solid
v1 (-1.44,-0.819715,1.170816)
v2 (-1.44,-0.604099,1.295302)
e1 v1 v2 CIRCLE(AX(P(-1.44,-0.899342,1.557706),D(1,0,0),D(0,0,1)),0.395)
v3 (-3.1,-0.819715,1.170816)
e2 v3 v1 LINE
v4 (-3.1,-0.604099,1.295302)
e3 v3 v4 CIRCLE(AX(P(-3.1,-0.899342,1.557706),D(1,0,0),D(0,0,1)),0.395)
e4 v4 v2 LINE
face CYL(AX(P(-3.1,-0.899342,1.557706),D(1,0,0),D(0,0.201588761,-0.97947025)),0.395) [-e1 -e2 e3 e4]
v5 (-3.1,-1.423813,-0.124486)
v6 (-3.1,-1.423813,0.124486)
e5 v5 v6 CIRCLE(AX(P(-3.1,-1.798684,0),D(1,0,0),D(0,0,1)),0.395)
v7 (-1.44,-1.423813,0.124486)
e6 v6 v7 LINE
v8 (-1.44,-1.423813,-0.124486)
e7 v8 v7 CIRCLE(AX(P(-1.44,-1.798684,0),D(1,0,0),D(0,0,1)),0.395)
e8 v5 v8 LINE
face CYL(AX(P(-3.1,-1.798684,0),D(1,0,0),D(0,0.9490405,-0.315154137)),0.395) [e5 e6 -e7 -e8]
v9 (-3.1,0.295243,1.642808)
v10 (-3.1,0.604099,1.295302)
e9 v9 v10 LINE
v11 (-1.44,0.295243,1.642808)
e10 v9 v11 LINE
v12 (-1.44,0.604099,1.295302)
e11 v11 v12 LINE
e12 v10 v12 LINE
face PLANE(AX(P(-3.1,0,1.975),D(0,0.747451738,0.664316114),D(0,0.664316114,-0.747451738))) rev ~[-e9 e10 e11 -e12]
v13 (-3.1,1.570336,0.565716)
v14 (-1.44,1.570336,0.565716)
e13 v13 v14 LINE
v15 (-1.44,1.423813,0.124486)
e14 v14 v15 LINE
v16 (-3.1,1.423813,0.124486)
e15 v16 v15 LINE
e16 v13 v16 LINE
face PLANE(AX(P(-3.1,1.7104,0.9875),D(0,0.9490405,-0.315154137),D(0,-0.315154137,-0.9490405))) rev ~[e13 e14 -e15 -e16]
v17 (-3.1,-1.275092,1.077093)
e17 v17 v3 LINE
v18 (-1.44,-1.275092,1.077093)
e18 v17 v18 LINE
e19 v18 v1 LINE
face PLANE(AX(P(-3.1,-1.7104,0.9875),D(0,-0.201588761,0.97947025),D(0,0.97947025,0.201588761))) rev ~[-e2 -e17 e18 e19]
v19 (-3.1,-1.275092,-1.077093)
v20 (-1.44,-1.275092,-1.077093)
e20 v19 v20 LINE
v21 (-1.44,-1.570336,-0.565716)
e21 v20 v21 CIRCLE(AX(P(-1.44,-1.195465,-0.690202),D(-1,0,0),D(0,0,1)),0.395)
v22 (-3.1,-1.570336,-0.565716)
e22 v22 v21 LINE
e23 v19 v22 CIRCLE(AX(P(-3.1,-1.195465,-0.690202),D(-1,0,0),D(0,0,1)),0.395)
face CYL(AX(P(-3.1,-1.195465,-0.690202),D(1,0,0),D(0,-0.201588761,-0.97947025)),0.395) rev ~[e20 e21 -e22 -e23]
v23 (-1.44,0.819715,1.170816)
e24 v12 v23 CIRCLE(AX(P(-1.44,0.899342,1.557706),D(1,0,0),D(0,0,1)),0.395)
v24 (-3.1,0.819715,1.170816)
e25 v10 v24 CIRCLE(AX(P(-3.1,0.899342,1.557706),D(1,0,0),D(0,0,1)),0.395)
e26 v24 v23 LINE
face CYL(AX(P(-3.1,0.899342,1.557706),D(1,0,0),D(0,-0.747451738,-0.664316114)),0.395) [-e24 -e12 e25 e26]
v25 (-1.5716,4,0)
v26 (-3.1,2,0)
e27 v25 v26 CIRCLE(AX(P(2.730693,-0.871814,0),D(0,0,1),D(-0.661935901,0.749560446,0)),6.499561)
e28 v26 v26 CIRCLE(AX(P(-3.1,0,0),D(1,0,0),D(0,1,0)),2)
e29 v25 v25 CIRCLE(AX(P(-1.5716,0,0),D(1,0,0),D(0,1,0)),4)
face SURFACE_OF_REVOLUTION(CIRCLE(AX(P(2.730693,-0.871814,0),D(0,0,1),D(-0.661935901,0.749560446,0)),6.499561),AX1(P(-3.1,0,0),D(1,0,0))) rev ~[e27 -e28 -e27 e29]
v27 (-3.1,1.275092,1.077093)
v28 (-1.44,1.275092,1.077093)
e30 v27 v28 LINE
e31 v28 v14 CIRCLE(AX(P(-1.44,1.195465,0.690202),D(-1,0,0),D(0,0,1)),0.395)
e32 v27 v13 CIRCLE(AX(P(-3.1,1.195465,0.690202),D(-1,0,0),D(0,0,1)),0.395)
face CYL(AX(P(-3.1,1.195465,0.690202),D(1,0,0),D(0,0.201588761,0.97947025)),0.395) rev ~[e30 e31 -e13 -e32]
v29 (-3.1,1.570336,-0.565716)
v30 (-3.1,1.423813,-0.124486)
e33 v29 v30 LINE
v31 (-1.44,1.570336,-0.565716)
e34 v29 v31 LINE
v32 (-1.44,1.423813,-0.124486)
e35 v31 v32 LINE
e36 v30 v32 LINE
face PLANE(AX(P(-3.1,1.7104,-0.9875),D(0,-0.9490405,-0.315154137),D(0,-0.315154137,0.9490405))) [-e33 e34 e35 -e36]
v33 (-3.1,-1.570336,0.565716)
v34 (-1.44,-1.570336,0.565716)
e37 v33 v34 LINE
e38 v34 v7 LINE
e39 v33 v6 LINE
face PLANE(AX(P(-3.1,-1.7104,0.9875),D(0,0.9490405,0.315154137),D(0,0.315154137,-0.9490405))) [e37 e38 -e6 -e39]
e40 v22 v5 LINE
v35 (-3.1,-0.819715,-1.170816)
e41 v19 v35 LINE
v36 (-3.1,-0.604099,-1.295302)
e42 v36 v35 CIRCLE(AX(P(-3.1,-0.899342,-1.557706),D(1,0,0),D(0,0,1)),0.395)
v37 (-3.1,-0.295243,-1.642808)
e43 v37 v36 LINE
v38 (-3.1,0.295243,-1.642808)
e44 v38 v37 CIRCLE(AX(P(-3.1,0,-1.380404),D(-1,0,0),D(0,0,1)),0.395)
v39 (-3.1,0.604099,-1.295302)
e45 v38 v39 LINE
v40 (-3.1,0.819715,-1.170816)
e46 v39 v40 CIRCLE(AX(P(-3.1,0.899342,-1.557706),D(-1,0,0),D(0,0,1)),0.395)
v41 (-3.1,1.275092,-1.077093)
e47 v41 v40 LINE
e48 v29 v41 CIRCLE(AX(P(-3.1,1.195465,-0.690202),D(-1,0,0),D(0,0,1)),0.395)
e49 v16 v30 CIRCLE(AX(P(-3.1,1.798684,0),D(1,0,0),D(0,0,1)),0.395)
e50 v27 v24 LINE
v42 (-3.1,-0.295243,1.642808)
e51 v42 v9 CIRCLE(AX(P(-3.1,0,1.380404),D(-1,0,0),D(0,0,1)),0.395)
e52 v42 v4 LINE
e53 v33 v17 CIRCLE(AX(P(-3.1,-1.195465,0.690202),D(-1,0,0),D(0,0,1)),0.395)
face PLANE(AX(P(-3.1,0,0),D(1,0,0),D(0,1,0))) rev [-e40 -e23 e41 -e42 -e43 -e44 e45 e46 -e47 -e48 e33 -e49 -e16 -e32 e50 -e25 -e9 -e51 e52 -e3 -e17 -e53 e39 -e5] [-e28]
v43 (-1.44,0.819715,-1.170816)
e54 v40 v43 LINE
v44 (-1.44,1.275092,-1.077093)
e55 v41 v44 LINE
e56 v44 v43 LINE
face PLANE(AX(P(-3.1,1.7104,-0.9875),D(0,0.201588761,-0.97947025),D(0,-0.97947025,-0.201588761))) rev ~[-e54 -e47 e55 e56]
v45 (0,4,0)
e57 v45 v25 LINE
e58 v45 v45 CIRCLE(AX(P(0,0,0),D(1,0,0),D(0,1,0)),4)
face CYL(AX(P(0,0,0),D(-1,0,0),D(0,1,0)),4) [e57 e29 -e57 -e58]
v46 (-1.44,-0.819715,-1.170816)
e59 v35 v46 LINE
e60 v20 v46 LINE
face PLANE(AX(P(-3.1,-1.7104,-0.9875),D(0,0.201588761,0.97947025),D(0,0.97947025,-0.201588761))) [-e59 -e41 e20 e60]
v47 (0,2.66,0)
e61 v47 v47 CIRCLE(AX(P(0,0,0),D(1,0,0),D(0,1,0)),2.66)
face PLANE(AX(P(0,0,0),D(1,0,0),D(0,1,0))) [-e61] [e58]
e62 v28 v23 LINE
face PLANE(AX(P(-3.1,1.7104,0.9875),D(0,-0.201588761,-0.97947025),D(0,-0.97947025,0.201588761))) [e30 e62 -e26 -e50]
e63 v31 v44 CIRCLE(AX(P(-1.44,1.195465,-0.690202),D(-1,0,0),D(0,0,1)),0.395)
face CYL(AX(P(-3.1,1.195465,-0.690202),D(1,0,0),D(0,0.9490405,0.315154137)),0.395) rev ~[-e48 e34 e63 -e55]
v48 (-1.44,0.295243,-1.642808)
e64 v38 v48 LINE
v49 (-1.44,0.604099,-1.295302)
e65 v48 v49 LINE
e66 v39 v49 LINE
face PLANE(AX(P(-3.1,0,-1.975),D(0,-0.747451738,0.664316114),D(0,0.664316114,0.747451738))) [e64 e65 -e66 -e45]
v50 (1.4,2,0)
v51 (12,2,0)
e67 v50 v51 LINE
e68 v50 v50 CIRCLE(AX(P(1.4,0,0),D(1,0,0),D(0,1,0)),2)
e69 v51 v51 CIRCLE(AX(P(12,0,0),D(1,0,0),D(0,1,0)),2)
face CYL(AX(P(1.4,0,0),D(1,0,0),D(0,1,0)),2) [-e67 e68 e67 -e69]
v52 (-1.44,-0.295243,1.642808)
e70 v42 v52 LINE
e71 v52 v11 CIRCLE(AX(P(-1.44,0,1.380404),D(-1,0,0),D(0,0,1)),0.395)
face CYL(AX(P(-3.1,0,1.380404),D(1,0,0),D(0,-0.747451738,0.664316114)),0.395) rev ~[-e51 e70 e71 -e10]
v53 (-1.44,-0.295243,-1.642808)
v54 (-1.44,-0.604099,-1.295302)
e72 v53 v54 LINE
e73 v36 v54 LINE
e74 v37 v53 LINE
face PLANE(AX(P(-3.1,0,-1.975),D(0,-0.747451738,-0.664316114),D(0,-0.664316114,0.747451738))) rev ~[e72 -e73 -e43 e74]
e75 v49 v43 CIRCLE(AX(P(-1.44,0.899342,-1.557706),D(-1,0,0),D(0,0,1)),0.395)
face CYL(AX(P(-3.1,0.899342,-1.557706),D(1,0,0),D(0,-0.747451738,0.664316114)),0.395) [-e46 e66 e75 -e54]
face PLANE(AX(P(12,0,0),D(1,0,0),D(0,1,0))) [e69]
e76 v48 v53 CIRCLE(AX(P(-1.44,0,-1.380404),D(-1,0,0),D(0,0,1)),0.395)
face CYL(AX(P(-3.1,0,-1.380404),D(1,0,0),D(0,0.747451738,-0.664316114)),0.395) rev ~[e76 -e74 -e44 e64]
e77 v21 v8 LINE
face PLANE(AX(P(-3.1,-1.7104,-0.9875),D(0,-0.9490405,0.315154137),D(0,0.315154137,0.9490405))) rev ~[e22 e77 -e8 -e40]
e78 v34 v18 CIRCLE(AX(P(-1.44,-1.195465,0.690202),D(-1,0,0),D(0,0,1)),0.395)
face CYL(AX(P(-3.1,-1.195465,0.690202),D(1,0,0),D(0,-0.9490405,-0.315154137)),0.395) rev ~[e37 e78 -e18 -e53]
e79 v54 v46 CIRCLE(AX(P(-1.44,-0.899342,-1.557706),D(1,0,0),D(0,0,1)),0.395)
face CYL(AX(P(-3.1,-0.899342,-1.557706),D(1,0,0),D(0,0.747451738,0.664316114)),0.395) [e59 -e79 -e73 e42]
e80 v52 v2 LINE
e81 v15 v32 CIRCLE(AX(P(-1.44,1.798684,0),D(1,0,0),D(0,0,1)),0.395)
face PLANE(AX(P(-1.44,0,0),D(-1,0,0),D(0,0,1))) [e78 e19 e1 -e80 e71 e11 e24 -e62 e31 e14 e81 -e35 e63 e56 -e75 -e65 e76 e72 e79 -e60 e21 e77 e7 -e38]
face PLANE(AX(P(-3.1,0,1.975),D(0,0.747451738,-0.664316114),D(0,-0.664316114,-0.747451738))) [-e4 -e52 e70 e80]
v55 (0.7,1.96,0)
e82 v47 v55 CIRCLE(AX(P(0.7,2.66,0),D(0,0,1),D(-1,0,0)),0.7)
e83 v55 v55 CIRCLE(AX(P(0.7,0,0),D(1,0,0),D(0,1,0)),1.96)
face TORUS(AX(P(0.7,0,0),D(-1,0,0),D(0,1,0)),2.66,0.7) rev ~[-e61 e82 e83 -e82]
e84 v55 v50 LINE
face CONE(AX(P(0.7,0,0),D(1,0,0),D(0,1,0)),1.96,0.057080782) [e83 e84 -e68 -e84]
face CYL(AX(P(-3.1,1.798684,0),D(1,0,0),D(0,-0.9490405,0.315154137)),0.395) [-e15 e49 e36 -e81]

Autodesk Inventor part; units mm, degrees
ref_plane "YZ Plane" through (0, 0, 0) normal (1, 0, 0) x (0, 1, 0)
ref_plane "XZ Plane" through (0, 0, 0) normal (0, 1, 0) x (-1, 0, 0)
ref_plane "XY Plane" through (0, 0, 0) normal (0, 0, 1) x (1, 0, 0)
sketch "Sketch4" plane through (0, 0, 0) normal (0, 0, 1) x (1, 0, 0)
  line L0 (-3.1, 0) -> (12, 0)
  line L1 (0, 0) -> (-3.1, 0)
  line L2 (0, 4) -> (0, 2.66)
  line L3 (0.7, 1.96) -> (0.7, 1.96)
  line L4 (0.7, 1.96) -> (1.4, 2)
  arc A0 (0, 2.66) -> (0.7, 1.96) centre (0.7, 2.66) ccw
  line L5 (-3.1, 0) -> (-3.1, 2)
  line L6 (0, 4) -> (-1.5716, 4)
  arc A1 (-1.5716, 4) -> (-3.1, 2) centre (2.731, -0.8721) ccw
  line L7 (1.4, 2) -> (12, 2)
  line L8 (12, 2) -> (12, 0)
  point P0 (0, 1.96)
  dimension "d71" = 0.7
  dimension "d72" = 12
  dimension "d74" = 0.7
  dimension "d75" = 3.92
  dimension "d78" = 4
  dimension "d82" = 6.5
  dimension "d83" = 3.1
  dimension "d84" = 8
  dimension "d104" = 10.6
  dimension "d105" = 4
revolve "Revolution7" add sketch "Sketch4" angle 360 about axis through (-3.1, 0, 0) along (1, 0, 0)
sketch "Sketch5" plane through (-3.1, 0, 0) normal (-1, 0, 0) x (0, 0, 1)
  circle A0 centre (0, 0) radius 1.975 construction
  circle A1 centre (0, 0) radius 1.3825 construction
  line L0 (0, 0) -> (-1.1973, 0.6912)
  line L1 (0, 0) -> (-1.1973, -0.6912)
  line L2 (-1.8008, 0) -> (1.7887, 0)
  line L3 (-1.975, 0) -> (-1.1973, -0.6912)
  line L4 (-1.975, 0) -> (-1.1973, 0.6912)
  point P0 (0, 0)
  dimension "d88" = 3.95
  dimension "d89" = 2.765
  dimension "d90" = 30
  dimension "d91" = 30
extrude "Extrusion1" cut sketch "Sketch5" against normal blind 1.66
pattern_circular "Circular Pattern1" count 6 over 360 about axis through (-10, 0, 0) along (1, 0, 0) of "Extrusion1"
fillet "Fillet1" radius 0.395 12 edges at (-2.27, -1.7104, -0.9875) (-2.27, -0.6912, -1.1973) (-2.27, -1.3825, 0) (-2.27, -1.7104, 0.9875) (-2.27, -0.6912, 1.1973) (-2.27, 0, 1.975) (-2.27, 1.3825, 0) (-2.27, 1.7104, 0.9875) (-2.27, 0.6913, 1.1973) (-2.27, 0.6912, -1.1973) (-2.27, 0, -1.975) (-2.27, 1.7104, -0.9875)
thread "Thread7" size "M4x0.7" class "6g" standard "ISO Metric profile" length 10.6
equation "\"a\" = 1.4"
equation "\"b\" = 10.6"
equation "\"dk\" = 8"
equation "\"k\" = 3.1"
equation "\"r\" = 0.7"
equation "\"rf\" = 6.5"
equation "\"x\" = 0.7"
equation "\"A_\" = 3.95"
equation "\"t\" = 1.66"
equation "\"p\" = 0.7"
equation "\"l_\" = 12"
equation "\"d\" = 4"
equation "\"ds_\" = 3.92"
equation "\"lg\" = 0"
properties part number "Flachkopfschraube mit Innenrund ISO 14583 - M4 x 12 - 4.8" material "Stahl"
